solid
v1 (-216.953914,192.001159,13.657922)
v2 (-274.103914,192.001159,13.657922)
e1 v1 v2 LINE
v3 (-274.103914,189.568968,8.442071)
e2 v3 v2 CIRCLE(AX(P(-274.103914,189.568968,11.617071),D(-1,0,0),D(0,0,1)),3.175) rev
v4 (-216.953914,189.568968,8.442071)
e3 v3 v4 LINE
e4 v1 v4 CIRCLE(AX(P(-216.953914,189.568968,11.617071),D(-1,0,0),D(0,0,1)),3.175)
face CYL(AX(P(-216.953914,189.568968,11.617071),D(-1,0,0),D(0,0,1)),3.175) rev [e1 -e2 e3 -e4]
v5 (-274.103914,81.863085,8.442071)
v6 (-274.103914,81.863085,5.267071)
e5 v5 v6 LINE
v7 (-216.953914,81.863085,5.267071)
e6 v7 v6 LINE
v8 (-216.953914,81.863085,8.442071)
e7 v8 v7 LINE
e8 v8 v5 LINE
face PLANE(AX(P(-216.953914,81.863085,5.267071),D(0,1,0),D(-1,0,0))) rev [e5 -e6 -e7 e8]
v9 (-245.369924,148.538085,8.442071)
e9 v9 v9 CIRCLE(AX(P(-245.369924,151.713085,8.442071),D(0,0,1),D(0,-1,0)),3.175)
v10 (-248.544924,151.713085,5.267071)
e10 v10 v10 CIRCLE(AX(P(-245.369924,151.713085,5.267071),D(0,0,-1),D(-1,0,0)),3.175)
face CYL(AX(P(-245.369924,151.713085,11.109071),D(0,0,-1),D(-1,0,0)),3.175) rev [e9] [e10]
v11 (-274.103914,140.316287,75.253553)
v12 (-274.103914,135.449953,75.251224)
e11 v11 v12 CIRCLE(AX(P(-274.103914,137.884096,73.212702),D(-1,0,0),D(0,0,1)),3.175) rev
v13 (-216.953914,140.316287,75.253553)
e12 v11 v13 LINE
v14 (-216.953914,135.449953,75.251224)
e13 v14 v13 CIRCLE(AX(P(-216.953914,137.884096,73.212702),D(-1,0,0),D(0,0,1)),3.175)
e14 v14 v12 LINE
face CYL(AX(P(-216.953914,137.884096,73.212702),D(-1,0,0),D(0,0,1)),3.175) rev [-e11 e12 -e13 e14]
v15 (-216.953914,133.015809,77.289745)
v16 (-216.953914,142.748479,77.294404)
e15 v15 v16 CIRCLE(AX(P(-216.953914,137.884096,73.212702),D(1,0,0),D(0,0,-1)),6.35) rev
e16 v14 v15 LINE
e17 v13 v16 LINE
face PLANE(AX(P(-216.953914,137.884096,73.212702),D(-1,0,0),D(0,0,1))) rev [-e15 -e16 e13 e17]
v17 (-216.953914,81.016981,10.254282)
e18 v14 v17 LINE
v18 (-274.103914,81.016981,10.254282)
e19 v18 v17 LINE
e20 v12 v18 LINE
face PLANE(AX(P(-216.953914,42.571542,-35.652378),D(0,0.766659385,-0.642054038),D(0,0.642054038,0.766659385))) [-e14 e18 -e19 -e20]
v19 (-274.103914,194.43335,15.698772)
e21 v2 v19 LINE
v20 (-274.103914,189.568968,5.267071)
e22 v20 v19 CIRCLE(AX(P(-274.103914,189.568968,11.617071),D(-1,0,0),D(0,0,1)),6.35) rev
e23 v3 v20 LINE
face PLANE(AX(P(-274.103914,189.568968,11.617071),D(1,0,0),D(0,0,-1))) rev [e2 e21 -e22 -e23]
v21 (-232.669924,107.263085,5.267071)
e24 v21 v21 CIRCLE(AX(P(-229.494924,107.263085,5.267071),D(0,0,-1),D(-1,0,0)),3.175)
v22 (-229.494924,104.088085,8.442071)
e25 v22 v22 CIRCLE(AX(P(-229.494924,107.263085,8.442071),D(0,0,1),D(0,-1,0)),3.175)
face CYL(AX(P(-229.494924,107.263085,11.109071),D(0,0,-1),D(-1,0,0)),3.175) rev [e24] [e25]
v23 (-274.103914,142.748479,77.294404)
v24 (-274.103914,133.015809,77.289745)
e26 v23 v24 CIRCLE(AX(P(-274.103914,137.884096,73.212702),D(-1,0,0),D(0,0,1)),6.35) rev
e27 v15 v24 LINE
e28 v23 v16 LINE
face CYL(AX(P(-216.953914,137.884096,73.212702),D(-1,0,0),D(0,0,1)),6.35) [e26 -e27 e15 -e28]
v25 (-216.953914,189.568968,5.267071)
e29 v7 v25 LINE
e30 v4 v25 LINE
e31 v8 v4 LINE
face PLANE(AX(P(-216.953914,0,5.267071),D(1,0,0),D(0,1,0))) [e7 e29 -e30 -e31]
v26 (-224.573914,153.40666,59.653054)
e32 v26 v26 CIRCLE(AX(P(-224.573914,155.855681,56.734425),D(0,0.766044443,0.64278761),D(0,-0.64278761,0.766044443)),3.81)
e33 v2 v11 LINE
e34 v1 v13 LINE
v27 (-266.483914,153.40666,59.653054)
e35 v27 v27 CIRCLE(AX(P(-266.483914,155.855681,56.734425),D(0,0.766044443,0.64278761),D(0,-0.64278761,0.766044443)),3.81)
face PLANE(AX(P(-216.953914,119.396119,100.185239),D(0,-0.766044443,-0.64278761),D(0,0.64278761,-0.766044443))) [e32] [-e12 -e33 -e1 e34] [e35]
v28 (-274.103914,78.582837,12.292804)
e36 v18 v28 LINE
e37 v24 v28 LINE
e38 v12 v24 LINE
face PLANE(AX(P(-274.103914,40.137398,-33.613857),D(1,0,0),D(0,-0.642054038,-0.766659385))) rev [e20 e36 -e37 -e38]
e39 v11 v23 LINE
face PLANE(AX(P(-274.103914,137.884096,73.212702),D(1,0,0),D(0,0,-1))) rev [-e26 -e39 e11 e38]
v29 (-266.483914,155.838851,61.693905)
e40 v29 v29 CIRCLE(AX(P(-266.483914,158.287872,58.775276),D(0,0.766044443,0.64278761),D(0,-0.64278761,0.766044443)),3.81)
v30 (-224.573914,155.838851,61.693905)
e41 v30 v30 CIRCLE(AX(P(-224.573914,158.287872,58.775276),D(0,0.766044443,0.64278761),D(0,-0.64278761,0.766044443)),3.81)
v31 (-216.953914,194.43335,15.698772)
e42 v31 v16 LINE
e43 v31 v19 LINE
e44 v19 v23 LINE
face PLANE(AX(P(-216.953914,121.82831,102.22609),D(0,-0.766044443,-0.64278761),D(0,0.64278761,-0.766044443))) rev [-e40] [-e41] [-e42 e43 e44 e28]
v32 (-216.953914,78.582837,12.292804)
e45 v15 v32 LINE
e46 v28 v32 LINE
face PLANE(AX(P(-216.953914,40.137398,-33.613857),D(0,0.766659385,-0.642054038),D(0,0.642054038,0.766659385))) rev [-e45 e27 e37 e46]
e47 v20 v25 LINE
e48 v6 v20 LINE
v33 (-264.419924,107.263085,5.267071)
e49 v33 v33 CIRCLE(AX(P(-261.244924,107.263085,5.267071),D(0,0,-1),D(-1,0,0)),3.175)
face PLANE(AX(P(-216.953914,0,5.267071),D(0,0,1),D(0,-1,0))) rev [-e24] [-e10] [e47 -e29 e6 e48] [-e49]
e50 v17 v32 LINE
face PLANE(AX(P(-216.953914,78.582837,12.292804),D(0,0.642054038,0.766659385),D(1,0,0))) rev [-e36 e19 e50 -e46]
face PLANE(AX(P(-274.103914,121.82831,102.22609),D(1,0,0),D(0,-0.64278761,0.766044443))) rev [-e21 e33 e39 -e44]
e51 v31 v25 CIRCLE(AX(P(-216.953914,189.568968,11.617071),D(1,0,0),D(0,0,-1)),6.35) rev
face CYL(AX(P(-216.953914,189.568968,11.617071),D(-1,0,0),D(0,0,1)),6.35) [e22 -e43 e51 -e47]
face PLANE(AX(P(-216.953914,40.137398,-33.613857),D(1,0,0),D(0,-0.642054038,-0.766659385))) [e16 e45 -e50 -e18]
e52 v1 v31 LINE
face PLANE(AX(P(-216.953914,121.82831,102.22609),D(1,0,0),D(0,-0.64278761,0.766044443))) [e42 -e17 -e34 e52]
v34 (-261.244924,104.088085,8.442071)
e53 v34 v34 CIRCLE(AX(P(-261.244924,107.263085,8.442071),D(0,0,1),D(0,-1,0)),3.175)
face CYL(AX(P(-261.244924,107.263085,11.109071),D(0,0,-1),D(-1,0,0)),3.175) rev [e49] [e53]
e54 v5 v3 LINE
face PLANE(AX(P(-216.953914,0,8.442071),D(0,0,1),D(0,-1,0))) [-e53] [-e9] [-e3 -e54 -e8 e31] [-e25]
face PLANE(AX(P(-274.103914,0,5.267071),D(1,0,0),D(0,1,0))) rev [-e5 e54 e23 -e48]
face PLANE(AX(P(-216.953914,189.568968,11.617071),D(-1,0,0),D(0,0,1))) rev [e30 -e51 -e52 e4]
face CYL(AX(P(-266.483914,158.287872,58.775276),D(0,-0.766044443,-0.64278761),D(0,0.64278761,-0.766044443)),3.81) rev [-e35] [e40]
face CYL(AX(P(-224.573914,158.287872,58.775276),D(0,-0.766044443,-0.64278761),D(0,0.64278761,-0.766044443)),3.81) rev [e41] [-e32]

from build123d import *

# Parameters (mm, degrees)
BOSS_EXTRUDE1_START    = -63.5
BOSS_EXTRUDE1_DEPTH    = 57.15
SKETCH4_R              = 3.81
CUT_EXTRUDE2_DEPTH     = 12.7
CONVERT_SOLID3_START   = -274.103914115
CONVERT_SOLID3_DEPTH   = 57.15
CONVERT_SOLID3_2_DEPTH = 57.15
SKETCH13_R             = 3.175
CUT_EXTRUDE3_DEPTH     = 5.842


# Read off the part's stored shape, not the designer's step: Convert-Solid3
with BuildPart() as part:
    # Sketch3 → Boss-Extrude1 (new body)
    with BuildSketch(Plane.ZY.offset(337.603914115).offset(BOSS_EXTRUDE1_START)):
        Polygon((5.267071178, 203.186586599), (83.097186599, 137.879365455), (5.267071178, 72.698998764), align=None)
        Polygon((78.154944449, 137.881730876), (8.442071178, 196.377777126), (8.442071178, 79.499308876), align=None, mode=Mode.SUBTRACT)
    extrude(amount=-BOSS_EXTRUDE1_DEPTH)

    # Sketch4 → Cut-Extrude2 (cut)
    with BuildSketch(Plane(origin=(0, 121.82830981, 102.226089829), x_dir=(1, 0, 0), z_dir=(0, 0.7660444431189748, 0.6427876096865434))):
        with Locations(Location((-266.483914115, 56.721009713, 0), (0, 0, 270))):
            Circle(SKETCH4_R)
        with Locations(Location((-224.573914115, 56.721009713, 0), (0, 0, 270))):
            Circle(SKETCH4_R)
    extrude(amount=-CUT_EXTRUDE2_DEPTH, mode=Mode.SUBTRACT)

    # Convert-Solid3 outline → Convert-Solid3 (cut)
    with BuildSketch(Plane.YZ.offset(CONVERT_SOLID3_START)):
        Polygon((72.698998764, 5.267071178), (81.863084577, 5.267071178), (81.863084577, 8.442071178), (79.499308876, 8.442071178), (81.016980609, 10.254282003), (78.582837061, 12.292803573), align=None)
        with BuildLine():
            ThreePointArc((195.068228967, 8.442071178), (192.743967654, 6.117809864), (189.568967654, 5.267071178))
            Line((189.568967654, 5.267071178), (203.186586599, 5.267071178))
            Line((203.186586599, 5.267071178), (194.433349867, 15.6987725))
            ThreePointArc((194.433349867, 15.6987725), (195.822496885, 12.719737106), (195.536015795, 9.445243268))
            Line((195.536015795, 9.445243268), (196.377777126, 8.442071178))
            Line((196.377777126, 8.442071178), (195.068228967, 8.442071178))
        make_face()
        with BuildLine():
            Line((137.879365455, 83.097186599), (133.015809203, 77.289745437))
            ThreePointArc((133.015809203, 77.289745437), (137.881057106, 79.562701571), (142.748478512, 77.29440362))
            Line((142.748478512, 77.29440362), (137.879365455, 83.097186599))
        make_face()
    extrude(amount=CONVERT_SOLID3_DEPTH, mode=Mode.SUBTRACT)

    # Convert-Solid3 2 outline → Convert-Solid3 2 (add)
    with BuildSketch(Plane.YZ.offset(CONVERT_SOLID3_START)):
        with BuildLine():
            ThreePointArc((192.001158761, 13.657921839), (192.446494877, 10.275258197), (189.568967654, 8.442071178))
            Line((189.568967654, 8.442071178), (195.068228967, 8.442071178))
            ThreePointArc((195.068228967, 8.442071178), (195.324022101, 8.933445216), (195.536015795, 9.445243268))
            Line((195.536015795, 9.445243268), (192.001158761, 13.657921839))
        make_face()
        with BuildLine():
            ThreePointArc((135.44995275, 75.251223868), (137.882576702, 76.387701935), (140.316287405, 75.253552959))
            Line((140.316287405, 75.253552959), (137.881730876, 78.154944449))
            Line((137.881730876, 78.154944449), (135.44995275, 75.251223868))
        make_face()
    extrude(amount=CONVERT_SOLID3_2_DEPTH)

    # Sketch13 → Cut-Extrude3 (cut)
    with BuildSketch(Plane(origin=(0, 0, 5.267071178), x_dir=(-1, 0, 0), z_dir=(0, 0, -1))):
        with Locations((229.4949236, 107.263084577)):
            Circle(SKETCH13_R)
        with Locations((261.2449236, 107.263084577)):
            Circle(SKETCH13_R)
        with Locations((245.3699236, 151.713084577)):
            Circle(SKETCH13_R)
    extrude(amount=-CUT_EXTRUDE3_DEPTH, mode=Mode.SUBTRACT)


solid = part.part
